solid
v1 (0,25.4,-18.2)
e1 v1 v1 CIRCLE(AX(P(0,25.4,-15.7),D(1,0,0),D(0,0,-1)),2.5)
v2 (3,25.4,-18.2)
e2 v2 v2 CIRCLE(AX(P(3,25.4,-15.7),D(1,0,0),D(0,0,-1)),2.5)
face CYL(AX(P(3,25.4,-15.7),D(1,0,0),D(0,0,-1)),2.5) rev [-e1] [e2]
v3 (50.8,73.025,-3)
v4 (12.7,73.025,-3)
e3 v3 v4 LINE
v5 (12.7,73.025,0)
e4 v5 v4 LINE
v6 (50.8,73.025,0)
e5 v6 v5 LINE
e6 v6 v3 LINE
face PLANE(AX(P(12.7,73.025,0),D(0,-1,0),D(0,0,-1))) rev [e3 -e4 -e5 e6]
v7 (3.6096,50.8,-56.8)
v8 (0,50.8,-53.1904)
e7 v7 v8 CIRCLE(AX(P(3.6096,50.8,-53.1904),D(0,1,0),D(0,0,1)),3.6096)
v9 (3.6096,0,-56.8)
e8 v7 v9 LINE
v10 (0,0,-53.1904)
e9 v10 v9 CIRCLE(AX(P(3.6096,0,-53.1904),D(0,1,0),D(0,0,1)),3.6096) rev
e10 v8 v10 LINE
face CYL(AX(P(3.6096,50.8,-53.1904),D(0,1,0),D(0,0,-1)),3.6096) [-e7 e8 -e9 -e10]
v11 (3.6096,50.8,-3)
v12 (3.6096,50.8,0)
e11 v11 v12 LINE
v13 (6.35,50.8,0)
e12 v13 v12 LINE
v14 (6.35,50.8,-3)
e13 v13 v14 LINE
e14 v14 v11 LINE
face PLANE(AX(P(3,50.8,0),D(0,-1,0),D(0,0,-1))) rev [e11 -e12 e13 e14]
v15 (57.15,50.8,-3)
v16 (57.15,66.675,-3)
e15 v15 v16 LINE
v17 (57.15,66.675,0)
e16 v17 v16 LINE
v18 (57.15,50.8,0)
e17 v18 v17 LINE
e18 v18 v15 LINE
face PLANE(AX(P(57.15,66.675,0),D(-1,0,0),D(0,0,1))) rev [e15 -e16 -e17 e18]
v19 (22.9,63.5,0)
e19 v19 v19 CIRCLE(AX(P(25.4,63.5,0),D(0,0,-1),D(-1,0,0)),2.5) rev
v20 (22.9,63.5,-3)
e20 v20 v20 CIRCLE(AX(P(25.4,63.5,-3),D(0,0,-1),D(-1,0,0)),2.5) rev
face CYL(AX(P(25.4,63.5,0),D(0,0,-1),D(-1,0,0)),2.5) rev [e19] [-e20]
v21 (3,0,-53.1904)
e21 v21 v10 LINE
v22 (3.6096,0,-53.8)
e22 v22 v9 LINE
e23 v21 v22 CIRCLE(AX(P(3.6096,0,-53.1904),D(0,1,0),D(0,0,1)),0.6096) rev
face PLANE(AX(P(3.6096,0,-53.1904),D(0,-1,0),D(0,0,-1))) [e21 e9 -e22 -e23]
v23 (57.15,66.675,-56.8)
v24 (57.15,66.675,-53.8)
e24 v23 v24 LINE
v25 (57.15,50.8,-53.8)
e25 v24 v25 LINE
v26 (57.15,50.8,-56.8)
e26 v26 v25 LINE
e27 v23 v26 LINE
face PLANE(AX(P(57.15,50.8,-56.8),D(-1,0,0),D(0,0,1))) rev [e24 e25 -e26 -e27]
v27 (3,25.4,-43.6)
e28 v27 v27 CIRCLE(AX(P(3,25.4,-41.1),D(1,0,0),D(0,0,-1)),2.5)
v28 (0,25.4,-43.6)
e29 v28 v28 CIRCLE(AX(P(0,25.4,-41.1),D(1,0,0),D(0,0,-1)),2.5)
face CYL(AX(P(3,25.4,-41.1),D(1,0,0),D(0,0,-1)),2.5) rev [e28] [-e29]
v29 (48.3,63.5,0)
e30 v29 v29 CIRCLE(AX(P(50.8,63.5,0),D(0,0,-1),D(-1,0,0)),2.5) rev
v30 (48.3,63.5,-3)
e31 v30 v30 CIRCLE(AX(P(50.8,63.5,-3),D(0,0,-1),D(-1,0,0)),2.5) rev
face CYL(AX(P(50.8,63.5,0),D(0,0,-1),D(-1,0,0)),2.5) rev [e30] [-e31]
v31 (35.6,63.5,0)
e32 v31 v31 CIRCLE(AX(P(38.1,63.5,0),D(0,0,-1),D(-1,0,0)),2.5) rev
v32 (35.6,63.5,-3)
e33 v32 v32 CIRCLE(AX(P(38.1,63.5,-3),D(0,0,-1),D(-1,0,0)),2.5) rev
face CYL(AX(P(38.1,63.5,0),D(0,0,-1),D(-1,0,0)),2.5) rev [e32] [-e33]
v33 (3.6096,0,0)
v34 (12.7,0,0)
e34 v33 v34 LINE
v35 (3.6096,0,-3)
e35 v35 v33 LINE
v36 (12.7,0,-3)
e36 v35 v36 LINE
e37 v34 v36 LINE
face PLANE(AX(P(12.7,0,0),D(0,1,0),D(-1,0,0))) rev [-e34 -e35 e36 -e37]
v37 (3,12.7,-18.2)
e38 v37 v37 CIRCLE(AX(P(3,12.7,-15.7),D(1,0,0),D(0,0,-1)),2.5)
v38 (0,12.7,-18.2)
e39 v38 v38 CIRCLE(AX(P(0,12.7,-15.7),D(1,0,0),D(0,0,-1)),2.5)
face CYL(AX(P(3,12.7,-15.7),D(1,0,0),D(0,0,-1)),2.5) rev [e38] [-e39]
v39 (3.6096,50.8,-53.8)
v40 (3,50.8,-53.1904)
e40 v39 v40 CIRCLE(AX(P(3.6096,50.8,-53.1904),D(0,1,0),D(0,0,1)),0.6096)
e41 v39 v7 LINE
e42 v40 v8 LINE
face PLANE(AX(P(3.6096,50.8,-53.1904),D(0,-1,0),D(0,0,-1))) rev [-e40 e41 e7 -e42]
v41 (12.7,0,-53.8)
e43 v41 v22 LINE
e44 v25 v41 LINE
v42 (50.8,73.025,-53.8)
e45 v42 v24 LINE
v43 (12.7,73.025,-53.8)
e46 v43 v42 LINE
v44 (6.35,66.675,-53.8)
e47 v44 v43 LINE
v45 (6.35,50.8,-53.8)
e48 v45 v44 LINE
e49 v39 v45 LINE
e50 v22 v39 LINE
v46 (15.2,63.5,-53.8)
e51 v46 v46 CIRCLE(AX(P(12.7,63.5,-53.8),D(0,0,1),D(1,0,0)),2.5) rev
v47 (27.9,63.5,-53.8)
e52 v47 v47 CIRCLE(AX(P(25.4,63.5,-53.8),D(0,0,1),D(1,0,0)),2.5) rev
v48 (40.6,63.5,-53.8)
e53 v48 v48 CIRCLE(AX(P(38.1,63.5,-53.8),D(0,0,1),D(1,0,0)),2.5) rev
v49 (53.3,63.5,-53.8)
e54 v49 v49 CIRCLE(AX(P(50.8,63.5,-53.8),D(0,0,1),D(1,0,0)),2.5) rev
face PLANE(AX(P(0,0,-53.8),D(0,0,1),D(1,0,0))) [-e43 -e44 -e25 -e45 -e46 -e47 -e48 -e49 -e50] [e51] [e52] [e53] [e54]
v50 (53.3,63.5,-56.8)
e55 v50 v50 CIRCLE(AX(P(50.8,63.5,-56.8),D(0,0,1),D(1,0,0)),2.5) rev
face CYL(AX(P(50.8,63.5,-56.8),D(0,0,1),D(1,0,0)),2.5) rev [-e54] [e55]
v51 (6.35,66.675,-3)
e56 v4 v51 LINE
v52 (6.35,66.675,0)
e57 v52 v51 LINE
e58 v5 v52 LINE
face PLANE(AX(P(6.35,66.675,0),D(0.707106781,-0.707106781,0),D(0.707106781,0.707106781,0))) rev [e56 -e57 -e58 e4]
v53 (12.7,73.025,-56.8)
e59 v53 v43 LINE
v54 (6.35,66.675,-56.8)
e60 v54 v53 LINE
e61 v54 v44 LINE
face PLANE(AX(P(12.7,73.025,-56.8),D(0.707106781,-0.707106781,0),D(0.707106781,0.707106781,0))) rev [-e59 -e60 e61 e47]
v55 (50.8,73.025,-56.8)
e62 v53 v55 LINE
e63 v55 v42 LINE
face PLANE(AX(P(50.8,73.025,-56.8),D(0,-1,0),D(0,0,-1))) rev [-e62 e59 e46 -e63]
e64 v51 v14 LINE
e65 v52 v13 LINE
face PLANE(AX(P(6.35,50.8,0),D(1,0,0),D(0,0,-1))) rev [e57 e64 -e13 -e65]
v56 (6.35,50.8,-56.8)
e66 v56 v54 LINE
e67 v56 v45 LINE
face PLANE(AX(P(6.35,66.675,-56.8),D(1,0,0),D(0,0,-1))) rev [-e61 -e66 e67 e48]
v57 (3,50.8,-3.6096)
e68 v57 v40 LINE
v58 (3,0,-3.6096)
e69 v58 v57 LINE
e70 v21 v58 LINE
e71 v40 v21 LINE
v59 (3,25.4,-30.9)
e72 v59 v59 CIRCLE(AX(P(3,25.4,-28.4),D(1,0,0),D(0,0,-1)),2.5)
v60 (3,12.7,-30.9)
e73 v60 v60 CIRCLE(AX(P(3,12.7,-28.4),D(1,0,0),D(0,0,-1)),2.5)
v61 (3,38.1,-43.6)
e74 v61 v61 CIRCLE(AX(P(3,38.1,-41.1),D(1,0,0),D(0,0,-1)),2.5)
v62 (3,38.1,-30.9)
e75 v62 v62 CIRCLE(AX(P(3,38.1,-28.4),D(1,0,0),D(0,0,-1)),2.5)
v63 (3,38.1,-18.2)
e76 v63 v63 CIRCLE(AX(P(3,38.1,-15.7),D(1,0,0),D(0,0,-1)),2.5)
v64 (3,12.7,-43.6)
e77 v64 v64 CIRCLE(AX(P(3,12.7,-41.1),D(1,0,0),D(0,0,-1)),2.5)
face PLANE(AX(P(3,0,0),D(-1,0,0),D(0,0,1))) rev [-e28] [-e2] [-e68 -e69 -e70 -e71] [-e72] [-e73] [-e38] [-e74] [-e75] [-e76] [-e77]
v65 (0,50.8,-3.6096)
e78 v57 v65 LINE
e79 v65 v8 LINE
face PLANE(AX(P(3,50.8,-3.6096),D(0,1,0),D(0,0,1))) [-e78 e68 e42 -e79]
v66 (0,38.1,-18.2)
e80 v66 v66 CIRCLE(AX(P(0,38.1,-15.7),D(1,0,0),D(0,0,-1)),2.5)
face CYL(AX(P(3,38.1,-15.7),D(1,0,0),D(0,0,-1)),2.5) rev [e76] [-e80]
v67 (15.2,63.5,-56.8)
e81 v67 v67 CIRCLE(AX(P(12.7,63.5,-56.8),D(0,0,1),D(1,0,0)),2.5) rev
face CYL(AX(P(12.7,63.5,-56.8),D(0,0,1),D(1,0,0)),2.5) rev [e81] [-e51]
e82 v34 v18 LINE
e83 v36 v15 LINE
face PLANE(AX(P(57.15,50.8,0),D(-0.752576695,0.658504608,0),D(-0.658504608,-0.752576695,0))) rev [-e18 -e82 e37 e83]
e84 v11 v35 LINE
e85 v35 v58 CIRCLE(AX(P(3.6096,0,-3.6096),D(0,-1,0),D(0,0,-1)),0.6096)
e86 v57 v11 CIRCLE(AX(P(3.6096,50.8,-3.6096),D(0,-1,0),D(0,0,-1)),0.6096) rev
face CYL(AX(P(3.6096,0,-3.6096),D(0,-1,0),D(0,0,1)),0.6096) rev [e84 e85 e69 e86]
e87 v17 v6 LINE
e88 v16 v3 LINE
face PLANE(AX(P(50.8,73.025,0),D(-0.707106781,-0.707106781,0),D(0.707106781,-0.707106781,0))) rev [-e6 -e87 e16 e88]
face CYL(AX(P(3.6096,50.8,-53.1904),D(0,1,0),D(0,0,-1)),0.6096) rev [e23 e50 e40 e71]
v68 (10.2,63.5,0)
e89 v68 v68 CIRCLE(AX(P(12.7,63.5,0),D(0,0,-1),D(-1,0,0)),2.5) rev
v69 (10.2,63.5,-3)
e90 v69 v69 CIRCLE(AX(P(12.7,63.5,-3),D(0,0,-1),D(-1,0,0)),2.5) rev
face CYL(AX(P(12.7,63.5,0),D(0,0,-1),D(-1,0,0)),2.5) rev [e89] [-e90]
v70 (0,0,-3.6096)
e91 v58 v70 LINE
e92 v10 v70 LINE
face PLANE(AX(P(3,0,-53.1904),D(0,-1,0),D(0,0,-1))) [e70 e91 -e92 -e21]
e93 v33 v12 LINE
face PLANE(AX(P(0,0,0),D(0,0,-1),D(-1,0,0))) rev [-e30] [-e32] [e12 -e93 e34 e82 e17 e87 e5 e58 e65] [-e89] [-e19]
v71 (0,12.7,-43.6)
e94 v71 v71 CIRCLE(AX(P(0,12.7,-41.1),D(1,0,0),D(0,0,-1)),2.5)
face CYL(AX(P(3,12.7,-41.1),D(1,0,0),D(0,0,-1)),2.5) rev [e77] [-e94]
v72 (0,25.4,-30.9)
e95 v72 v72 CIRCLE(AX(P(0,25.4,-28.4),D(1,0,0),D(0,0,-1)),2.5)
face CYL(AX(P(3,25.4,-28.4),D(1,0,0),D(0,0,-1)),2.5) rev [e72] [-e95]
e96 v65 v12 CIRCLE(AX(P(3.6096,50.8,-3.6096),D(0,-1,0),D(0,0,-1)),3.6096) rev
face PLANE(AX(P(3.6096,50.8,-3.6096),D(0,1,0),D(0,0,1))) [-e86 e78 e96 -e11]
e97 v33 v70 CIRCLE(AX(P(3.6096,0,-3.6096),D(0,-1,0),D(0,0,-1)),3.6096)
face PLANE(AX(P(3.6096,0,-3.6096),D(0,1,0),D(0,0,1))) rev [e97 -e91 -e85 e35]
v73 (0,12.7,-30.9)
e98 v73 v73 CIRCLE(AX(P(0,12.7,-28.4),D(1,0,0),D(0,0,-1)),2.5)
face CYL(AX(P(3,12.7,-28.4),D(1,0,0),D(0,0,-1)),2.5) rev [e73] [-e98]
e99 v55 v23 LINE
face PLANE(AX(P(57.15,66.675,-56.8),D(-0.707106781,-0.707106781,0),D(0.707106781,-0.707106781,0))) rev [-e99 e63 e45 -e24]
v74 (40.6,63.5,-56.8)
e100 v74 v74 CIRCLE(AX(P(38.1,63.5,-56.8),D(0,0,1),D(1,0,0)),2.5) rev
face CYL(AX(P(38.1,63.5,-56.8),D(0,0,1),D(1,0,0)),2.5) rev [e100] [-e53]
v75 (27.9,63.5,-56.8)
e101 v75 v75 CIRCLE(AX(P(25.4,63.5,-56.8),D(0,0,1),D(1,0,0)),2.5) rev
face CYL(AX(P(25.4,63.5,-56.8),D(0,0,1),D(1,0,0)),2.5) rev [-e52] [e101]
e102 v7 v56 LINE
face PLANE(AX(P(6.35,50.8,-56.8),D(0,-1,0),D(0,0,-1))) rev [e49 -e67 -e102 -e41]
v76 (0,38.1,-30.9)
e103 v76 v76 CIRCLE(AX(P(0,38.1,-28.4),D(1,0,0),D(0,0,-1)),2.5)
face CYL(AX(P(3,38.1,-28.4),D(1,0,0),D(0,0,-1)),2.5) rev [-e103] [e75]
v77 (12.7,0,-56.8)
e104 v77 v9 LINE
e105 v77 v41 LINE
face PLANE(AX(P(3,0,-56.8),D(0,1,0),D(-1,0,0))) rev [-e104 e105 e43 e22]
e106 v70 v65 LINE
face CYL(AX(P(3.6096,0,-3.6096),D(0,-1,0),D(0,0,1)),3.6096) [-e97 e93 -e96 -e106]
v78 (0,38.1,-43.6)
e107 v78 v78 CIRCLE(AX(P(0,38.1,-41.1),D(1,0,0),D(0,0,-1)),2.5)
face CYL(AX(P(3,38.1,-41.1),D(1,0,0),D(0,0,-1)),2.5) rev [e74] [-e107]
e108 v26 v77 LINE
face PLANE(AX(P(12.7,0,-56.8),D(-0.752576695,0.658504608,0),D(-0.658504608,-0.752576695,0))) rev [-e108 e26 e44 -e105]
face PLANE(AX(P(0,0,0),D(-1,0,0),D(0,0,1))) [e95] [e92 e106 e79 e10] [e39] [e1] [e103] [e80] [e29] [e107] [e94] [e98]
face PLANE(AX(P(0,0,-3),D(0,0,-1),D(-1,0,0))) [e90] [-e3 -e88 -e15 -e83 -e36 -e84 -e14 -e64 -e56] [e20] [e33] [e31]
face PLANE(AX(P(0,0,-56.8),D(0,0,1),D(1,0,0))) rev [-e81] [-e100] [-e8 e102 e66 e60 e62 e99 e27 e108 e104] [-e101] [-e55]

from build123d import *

# Parameters (mm, degrees)
SKETCH7_W               = 50.8
SKETCH7_H               = 49.5808
BASE_FLANGE1_DEPTH      = 3
F_10_CLEARANCE_HOLE1_D  = 5
EDGE_FLANGE1_DEPTH      = 50.8
EDGE_FLANGE1_START      = 3
EDGE_FLANGE1_PROFILE_R  = 2.5
EDGE_FLANGE1_FLAT_DEPTH = 3
EDGE_FLANGE2_DEPTH      = 50.8
EDGE_FLANGE2_START      = 3
EDGE_FLANGE2_PROFILE_R  = 2.5
EDGE_FLANGE2_FLAT_DEPTH = 3


# Sheet-metal steps are written as plain solids
with BuildPart() as part:
    # Sketch7 → Base-Flange1 (new body)
    with BuildSketch(Plane(origin=(0, 0, 0), x_dir=(0, -1, 0), z_dir=(-1, 0, 0))):
        with Locations((-25.4, -28.4)):
            Rectangle(SKETCH7_W, SKETCH7_H)
    extrude(amount=-BASE_FLANGE1_DEPTH)

    # #10 Clearance Hole1 (through all)
    with Locations(Plane(origin=(3, 0, 0), x_dir=(0, 0, -1), z_dir=(1, 0, 0))):
        with Locations((41.1, 12.7), (41.1, 25.4), (28.4, 25.4), (28.4, 12.7), (15.7, 12.7), (15.7, 25.4), (15.7, 38.1), (28.4, 38.1), (41.1, 38.1)):
            Hole(F_10_CLEARANCE_HOLE1_D / 2)

    # Edge-Flange1 bend section (across the edge) → Edge-Flange1 (add)
    with BuildSketch(Plane(origin=(3, 0, -53.8), x_dir=(0, 0, 1), z_dir=(0, 1, 0))):
        with BuildLine():
            Line((-3, 0.6096), (0, 0.6096))
            ThreePointArc((0, 0.6096), (0.178547706, 0.178547706), (0.6096, 0))
            Line((0.6096, 0), (0.6096, -3))
            ThreePointArc((0.6096, -3), (-1.942772637, -1.942772637), (-3, 0.6096))
        make_face()
    extrude(amount=EDGE_FLANGE1_DEPTH)

    # Edge-Flange1 profile (on flange) → Edge-Flange1 flat (add)
    with BuildSketch(Plane(origin=(3, 0, -53.8), x_dir=(0, 1, 0), z_dir=(0, 0, -1)).offset(EDGE_FLANGE1_START)):
        Polygon((0, 0.6096), (50.8, 0.6096), (50.8, 3.35), (66.675, 3.35), (73.025, 9.7), (73.025, 47.8), (66.675, 54.15), (50.8, 54.15), (0, 9.7), align=None)
        with Locations((63.5, 9.7)):
            Circle(EDGE_FLANGE1_PROFILE_R, mode=Mode.SUBTRACT)
        with Locations((63.5, 22.4)):
            Circle(EDGE_FLANGE1_PROFILE_R, mode=Mode.SUBTRACT)
        with Locations((63.5, 35.1)):
            Circle(EDGE_FLANGE1_PROFILE_R, mode=Mode.SUBTRACT)
        with Locations((63.5, 47.8)):
            Circle(EDGE_FLANGE1_PROFILE_R, mode=Mode.SUBTRACT)
    extrude(amount=-EDGE_FLANGE1_FLAT_DEPTH)

    # Edge-Flange2 bend section (across the edge) → Edge-Flange2 (add)
    with BuildSketch(Plane(origin=(3, 50.8, -3), x_dir=(0, 0, -1), z_dir=(0, -1, 0))):
        with BuildLine():
            Line((-3, 0.6096), (0, 0.6096))
            ThreePointArc((0, 0.6096), (0.178547706, 0.178547706), (0.6096, 0))
            Line((0.6096, 0), (0.6096, -3))
            ThreePointArc((0.6096, -3), (-1.942772637, -1.942772637), (-3, 0.6096))
        make_face()
    extrude(amount=EDGE_FLANGE2_DEPTH)

    # Edge-Flange2 profile (on flange) → Edge-Flange2 flat (add)
    with BuildSketch(Plane(origin=(3, 0, -3), x_dir=(0, -1, 0), z_dir=(0, 0, 1)).offset(EDGE_FLANGE2_START)):
        Polygon((0, 0.6096), (0, 9.7), (-50.8, 54.15), (-66.675, 54.15), (-73.025, 47.8), (-73.025, 9.7), (-66.675, 3.35), (-50.8, 3.35), (-50.8, 0.6096), align=None)
        with Locations((-63.5, 9.7)):
            Circle(EDGE_FLANGE2_PROFILE_R, mode=Mode.SUBTRACT)
        with Locations((-63.5, 22.4)):
            Circle(EDGE_FLANGE2_PROFILE_R, mode=Mode.SUBTRACT)
        with Locations((-63.5, 35.1)):
            Circle(EDGE_FLANGE2_PROFILE_R, mode=Mode.SUBTRACT)
        with Locations((-63.5, 47.8)):
            Circle(EDGE_FLANGE2_PROFILE_R, mode=Mode.SUBTRACT)
    extrude(amount=-EDGE_FLANGE2_FLAT_DEPTH)


solid = part.part
